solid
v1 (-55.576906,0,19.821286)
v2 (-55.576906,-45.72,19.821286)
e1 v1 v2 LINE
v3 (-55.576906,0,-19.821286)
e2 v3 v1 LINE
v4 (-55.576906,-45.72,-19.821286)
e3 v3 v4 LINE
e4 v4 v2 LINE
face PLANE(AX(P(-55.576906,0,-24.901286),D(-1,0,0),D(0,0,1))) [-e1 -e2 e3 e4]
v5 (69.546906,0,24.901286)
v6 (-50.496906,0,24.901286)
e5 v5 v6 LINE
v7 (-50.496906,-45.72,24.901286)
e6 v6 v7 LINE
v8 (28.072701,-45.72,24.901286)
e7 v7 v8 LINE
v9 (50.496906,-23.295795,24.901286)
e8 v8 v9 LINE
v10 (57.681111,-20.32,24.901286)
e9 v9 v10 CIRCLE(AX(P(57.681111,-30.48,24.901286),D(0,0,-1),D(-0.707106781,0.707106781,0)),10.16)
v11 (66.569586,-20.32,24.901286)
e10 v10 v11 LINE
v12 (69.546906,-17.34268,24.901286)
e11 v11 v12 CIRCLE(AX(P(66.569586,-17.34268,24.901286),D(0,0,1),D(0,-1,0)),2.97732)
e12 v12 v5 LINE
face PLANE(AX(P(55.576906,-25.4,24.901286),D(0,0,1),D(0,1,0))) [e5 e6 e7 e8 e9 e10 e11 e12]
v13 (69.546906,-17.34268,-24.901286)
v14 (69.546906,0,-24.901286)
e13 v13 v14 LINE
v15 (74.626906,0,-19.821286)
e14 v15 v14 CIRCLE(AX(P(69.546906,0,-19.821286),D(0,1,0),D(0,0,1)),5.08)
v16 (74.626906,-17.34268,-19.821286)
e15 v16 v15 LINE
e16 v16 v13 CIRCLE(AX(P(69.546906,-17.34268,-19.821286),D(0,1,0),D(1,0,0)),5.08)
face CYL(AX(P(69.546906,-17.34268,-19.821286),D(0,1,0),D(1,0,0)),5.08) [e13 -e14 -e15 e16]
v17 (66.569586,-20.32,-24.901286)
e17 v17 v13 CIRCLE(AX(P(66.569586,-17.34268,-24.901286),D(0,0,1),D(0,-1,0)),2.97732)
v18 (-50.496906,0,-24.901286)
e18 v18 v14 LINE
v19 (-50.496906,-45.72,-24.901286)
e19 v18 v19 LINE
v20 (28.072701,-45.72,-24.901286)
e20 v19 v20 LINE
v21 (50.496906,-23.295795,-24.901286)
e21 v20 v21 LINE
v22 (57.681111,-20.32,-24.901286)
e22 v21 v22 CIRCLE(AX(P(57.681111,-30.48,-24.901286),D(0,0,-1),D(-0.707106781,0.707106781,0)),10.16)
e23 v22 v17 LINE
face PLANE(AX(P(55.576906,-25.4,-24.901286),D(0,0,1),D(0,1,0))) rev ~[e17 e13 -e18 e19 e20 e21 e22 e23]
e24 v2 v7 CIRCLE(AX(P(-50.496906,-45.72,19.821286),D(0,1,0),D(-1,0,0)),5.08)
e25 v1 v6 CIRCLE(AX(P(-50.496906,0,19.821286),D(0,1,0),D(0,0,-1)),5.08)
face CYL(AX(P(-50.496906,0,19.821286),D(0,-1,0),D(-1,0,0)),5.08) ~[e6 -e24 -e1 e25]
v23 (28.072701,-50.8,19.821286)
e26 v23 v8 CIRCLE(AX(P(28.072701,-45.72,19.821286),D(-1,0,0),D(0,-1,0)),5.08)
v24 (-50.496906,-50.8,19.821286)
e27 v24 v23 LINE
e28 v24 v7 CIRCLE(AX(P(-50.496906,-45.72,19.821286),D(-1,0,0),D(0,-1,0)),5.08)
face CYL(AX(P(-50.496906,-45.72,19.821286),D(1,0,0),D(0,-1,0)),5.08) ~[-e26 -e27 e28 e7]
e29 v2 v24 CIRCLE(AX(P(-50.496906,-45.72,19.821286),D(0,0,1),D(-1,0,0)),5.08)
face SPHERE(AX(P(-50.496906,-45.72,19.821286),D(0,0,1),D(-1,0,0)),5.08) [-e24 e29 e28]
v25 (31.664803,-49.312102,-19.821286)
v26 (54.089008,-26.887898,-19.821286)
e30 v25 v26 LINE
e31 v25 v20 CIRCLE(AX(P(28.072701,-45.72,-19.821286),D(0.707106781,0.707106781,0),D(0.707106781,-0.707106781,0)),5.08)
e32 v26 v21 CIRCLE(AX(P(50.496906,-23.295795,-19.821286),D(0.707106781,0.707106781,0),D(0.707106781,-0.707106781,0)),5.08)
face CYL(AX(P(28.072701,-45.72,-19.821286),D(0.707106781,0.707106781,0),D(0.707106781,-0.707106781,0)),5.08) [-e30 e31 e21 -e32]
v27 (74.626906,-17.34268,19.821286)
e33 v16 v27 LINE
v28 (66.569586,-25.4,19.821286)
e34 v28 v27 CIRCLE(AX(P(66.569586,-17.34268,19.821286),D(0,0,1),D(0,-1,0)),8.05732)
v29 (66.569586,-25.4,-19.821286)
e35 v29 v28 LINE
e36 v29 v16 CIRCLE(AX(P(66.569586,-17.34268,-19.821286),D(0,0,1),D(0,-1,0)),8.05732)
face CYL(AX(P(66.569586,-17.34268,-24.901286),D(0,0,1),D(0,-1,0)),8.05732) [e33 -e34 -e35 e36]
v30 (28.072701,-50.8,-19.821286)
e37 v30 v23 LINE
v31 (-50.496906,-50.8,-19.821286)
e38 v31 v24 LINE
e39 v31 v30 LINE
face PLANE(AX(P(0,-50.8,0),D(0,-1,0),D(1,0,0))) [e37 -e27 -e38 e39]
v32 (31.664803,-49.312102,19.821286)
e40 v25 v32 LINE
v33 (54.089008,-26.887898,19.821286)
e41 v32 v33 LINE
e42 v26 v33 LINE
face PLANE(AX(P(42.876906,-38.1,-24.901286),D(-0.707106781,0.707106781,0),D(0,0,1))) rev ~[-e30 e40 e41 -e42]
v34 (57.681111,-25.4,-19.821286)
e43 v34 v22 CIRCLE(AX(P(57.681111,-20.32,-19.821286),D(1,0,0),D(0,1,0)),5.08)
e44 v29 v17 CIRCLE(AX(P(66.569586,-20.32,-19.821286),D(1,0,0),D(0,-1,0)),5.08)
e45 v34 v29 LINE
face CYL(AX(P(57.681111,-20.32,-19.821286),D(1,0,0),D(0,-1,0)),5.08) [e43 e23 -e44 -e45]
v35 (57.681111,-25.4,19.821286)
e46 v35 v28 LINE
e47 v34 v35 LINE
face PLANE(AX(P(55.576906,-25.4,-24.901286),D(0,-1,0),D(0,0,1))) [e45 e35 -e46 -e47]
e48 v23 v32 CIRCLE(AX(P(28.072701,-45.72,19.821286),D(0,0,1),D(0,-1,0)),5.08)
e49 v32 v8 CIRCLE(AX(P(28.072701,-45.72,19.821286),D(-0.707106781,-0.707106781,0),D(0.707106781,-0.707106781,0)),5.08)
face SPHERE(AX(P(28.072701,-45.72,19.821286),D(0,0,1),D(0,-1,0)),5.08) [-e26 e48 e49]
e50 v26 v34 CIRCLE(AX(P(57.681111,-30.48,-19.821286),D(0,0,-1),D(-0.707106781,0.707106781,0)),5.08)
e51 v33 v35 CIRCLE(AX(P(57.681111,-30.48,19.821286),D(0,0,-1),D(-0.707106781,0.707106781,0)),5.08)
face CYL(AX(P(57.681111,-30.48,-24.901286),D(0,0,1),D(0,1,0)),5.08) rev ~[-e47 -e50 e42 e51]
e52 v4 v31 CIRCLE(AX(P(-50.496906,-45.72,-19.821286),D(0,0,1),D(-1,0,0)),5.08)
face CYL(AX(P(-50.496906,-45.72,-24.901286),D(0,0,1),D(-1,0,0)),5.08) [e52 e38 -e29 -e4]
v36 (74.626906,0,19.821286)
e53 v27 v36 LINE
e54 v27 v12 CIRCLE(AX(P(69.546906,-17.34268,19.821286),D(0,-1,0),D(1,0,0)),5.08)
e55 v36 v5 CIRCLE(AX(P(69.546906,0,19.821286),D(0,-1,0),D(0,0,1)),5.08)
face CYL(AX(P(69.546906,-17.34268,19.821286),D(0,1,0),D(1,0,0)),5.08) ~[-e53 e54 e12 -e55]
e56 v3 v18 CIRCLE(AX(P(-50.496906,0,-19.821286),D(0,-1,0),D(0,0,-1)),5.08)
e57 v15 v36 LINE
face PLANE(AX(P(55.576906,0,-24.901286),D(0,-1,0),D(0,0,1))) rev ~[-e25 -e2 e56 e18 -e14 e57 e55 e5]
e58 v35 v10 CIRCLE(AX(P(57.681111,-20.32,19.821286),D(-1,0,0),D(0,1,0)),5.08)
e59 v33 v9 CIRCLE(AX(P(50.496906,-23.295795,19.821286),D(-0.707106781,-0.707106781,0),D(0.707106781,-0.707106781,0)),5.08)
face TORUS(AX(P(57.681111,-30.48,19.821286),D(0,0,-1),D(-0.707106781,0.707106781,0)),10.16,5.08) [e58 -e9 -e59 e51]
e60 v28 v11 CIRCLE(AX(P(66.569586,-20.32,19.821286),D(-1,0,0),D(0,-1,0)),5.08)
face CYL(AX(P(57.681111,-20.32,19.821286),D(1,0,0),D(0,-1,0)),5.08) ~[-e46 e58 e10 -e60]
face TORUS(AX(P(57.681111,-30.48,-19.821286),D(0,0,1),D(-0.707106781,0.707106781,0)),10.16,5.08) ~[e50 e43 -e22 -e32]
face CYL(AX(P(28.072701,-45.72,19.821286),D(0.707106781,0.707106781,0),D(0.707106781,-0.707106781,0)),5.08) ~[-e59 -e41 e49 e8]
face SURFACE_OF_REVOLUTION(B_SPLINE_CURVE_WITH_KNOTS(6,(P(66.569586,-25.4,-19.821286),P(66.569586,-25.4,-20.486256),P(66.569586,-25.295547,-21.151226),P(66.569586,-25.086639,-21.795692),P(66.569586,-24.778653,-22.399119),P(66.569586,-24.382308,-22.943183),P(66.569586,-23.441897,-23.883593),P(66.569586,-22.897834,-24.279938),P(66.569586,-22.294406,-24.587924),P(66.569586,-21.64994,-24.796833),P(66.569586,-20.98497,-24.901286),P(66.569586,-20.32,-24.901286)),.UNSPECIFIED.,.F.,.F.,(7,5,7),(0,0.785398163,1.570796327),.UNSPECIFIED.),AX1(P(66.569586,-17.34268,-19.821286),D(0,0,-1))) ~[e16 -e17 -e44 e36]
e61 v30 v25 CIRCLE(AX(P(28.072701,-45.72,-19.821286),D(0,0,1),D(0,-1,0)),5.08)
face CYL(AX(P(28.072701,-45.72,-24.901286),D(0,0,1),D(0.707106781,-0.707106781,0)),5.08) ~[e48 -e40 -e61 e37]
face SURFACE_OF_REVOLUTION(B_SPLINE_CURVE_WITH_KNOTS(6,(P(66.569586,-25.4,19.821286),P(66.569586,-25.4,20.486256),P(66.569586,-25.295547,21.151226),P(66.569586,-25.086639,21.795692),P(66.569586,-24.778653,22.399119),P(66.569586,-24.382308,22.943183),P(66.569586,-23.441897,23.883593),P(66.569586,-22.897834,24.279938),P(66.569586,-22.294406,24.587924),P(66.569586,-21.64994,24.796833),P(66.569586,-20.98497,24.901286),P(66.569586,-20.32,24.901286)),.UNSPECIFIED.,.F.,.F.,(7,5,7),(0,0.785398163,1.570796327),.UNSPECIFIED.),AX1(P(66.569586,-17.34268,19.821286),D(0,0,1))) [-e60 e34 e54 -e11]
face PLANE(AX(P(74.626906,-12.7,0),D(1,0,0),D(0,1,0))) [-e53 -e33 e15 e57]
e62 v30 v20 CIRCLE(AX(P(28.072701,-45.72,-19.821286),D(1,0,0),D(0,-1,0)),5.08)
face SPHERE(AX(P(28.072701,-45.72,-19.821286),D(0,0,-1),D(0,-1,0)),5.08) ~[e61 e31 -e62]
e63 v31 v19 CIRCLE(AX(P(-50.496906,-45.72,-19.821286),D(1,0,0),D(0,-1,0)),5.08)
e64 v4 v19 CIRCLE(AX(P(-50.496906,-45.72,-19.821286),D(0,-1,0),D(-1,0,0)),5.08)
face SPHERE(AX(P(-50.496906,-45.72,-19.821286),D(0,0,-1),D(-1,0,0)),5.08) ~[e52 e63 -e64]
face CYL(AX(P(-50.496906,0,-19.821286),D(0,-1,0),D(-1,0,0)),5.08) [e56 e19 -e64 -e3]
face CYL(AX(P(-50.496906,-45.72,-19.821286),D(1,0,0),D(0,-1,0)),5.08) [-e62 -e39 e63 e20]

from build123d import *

# Parameters (mm, degrees)
F0_W     = 111.1538112164
F0_H     = 49.8025715351
F1_DEPTH = 50.8
F2_R     = 5.08
F3_SIZE  = 25.4
F4_W     = 25.4
F4_H     = 49.8025715351
F5_DEPTH = 19.05
F6_R     = 8.0573195259
F7_F1_R  = 5.08
F7_F2_R  = 5.08
F7_F3_R  = 5.08
F7_F4_R  = 5.08


# Not quite as in the source:
# - a feature of the source that left no trace in its solid (it failed there, or was rolled back) is left out


with BuildPart() as f1:
    # F0 (on Front) → F1 (new body)
    with BuildSketch(Plane.XZ):
        Rectangle(F0_W, F0_H)
    extrude(amount=F1_DEPTH)

    # F2
    f2_edges = [f1.edges().sort_by_distance(p)[0] for p in [
        (-55.576906, -50.8, 0),
    ]]
    fillet(f2_edges, radius=F2_R)

    # F3
    f3_edges = [f1.edges().sort_by_distance(p)[0] for p in [
        (55.576906, -50.8, 0),
    ]]
    chamfer(f3_edges, length=F3_SIZE)

    # F4 (on face) → F5 (join)
    with BuildSketch(Plane.YZ.offset(55.5769056082)):
        with Locations((-12.7, 0)):
            Rectangle(F4_W, F4_H)
    extrude(amount=F5_DEPTH)

    # F6
    f6_edges = [f1.edges().sort_by_distance(p)[0] for p in [
        (74.626906, -25.4, 0),
    ]]
    fillet(f6_edges, radius=F6_R)

    # F7: fillet of radius 5.08 on 4 edges, made by hand

    # F7_f1
    f7_f1_edges = [f1.edges().sort_by_distance(p)[0] for p in [
        (55.5769056082, -25.4, 0),
    ]]
    fillet(f7_f1_edges, radius=F7_F1_R)

    # F7_f2
    f7_f2_edges = [f1.edges().sort_by_distance(p)[0] for p in [
        (30.1769056082, -50.8, 0),
    ]]
    fillet(f7_f2_edges, radius=F7_F2_R)

    # F7_f3
    f7_f3_edges = [f1.edges().sort_by_distance(p)[0] for p in [
        (42.8769056082, -38.1, 24.9012857676),
    ]]
    fillet(f7_f3_edges, radius=F7_F3_R)

    # F7_f4
    f7_f4_edges = [f1.edges().sort_by_distance(p)[0] for p in [
        (42.8769056082, -38.1, -24.9012857676),
    ]]
    fillet(f7_f4_edges, radius=F7_F4_R)


solid = f1.part
